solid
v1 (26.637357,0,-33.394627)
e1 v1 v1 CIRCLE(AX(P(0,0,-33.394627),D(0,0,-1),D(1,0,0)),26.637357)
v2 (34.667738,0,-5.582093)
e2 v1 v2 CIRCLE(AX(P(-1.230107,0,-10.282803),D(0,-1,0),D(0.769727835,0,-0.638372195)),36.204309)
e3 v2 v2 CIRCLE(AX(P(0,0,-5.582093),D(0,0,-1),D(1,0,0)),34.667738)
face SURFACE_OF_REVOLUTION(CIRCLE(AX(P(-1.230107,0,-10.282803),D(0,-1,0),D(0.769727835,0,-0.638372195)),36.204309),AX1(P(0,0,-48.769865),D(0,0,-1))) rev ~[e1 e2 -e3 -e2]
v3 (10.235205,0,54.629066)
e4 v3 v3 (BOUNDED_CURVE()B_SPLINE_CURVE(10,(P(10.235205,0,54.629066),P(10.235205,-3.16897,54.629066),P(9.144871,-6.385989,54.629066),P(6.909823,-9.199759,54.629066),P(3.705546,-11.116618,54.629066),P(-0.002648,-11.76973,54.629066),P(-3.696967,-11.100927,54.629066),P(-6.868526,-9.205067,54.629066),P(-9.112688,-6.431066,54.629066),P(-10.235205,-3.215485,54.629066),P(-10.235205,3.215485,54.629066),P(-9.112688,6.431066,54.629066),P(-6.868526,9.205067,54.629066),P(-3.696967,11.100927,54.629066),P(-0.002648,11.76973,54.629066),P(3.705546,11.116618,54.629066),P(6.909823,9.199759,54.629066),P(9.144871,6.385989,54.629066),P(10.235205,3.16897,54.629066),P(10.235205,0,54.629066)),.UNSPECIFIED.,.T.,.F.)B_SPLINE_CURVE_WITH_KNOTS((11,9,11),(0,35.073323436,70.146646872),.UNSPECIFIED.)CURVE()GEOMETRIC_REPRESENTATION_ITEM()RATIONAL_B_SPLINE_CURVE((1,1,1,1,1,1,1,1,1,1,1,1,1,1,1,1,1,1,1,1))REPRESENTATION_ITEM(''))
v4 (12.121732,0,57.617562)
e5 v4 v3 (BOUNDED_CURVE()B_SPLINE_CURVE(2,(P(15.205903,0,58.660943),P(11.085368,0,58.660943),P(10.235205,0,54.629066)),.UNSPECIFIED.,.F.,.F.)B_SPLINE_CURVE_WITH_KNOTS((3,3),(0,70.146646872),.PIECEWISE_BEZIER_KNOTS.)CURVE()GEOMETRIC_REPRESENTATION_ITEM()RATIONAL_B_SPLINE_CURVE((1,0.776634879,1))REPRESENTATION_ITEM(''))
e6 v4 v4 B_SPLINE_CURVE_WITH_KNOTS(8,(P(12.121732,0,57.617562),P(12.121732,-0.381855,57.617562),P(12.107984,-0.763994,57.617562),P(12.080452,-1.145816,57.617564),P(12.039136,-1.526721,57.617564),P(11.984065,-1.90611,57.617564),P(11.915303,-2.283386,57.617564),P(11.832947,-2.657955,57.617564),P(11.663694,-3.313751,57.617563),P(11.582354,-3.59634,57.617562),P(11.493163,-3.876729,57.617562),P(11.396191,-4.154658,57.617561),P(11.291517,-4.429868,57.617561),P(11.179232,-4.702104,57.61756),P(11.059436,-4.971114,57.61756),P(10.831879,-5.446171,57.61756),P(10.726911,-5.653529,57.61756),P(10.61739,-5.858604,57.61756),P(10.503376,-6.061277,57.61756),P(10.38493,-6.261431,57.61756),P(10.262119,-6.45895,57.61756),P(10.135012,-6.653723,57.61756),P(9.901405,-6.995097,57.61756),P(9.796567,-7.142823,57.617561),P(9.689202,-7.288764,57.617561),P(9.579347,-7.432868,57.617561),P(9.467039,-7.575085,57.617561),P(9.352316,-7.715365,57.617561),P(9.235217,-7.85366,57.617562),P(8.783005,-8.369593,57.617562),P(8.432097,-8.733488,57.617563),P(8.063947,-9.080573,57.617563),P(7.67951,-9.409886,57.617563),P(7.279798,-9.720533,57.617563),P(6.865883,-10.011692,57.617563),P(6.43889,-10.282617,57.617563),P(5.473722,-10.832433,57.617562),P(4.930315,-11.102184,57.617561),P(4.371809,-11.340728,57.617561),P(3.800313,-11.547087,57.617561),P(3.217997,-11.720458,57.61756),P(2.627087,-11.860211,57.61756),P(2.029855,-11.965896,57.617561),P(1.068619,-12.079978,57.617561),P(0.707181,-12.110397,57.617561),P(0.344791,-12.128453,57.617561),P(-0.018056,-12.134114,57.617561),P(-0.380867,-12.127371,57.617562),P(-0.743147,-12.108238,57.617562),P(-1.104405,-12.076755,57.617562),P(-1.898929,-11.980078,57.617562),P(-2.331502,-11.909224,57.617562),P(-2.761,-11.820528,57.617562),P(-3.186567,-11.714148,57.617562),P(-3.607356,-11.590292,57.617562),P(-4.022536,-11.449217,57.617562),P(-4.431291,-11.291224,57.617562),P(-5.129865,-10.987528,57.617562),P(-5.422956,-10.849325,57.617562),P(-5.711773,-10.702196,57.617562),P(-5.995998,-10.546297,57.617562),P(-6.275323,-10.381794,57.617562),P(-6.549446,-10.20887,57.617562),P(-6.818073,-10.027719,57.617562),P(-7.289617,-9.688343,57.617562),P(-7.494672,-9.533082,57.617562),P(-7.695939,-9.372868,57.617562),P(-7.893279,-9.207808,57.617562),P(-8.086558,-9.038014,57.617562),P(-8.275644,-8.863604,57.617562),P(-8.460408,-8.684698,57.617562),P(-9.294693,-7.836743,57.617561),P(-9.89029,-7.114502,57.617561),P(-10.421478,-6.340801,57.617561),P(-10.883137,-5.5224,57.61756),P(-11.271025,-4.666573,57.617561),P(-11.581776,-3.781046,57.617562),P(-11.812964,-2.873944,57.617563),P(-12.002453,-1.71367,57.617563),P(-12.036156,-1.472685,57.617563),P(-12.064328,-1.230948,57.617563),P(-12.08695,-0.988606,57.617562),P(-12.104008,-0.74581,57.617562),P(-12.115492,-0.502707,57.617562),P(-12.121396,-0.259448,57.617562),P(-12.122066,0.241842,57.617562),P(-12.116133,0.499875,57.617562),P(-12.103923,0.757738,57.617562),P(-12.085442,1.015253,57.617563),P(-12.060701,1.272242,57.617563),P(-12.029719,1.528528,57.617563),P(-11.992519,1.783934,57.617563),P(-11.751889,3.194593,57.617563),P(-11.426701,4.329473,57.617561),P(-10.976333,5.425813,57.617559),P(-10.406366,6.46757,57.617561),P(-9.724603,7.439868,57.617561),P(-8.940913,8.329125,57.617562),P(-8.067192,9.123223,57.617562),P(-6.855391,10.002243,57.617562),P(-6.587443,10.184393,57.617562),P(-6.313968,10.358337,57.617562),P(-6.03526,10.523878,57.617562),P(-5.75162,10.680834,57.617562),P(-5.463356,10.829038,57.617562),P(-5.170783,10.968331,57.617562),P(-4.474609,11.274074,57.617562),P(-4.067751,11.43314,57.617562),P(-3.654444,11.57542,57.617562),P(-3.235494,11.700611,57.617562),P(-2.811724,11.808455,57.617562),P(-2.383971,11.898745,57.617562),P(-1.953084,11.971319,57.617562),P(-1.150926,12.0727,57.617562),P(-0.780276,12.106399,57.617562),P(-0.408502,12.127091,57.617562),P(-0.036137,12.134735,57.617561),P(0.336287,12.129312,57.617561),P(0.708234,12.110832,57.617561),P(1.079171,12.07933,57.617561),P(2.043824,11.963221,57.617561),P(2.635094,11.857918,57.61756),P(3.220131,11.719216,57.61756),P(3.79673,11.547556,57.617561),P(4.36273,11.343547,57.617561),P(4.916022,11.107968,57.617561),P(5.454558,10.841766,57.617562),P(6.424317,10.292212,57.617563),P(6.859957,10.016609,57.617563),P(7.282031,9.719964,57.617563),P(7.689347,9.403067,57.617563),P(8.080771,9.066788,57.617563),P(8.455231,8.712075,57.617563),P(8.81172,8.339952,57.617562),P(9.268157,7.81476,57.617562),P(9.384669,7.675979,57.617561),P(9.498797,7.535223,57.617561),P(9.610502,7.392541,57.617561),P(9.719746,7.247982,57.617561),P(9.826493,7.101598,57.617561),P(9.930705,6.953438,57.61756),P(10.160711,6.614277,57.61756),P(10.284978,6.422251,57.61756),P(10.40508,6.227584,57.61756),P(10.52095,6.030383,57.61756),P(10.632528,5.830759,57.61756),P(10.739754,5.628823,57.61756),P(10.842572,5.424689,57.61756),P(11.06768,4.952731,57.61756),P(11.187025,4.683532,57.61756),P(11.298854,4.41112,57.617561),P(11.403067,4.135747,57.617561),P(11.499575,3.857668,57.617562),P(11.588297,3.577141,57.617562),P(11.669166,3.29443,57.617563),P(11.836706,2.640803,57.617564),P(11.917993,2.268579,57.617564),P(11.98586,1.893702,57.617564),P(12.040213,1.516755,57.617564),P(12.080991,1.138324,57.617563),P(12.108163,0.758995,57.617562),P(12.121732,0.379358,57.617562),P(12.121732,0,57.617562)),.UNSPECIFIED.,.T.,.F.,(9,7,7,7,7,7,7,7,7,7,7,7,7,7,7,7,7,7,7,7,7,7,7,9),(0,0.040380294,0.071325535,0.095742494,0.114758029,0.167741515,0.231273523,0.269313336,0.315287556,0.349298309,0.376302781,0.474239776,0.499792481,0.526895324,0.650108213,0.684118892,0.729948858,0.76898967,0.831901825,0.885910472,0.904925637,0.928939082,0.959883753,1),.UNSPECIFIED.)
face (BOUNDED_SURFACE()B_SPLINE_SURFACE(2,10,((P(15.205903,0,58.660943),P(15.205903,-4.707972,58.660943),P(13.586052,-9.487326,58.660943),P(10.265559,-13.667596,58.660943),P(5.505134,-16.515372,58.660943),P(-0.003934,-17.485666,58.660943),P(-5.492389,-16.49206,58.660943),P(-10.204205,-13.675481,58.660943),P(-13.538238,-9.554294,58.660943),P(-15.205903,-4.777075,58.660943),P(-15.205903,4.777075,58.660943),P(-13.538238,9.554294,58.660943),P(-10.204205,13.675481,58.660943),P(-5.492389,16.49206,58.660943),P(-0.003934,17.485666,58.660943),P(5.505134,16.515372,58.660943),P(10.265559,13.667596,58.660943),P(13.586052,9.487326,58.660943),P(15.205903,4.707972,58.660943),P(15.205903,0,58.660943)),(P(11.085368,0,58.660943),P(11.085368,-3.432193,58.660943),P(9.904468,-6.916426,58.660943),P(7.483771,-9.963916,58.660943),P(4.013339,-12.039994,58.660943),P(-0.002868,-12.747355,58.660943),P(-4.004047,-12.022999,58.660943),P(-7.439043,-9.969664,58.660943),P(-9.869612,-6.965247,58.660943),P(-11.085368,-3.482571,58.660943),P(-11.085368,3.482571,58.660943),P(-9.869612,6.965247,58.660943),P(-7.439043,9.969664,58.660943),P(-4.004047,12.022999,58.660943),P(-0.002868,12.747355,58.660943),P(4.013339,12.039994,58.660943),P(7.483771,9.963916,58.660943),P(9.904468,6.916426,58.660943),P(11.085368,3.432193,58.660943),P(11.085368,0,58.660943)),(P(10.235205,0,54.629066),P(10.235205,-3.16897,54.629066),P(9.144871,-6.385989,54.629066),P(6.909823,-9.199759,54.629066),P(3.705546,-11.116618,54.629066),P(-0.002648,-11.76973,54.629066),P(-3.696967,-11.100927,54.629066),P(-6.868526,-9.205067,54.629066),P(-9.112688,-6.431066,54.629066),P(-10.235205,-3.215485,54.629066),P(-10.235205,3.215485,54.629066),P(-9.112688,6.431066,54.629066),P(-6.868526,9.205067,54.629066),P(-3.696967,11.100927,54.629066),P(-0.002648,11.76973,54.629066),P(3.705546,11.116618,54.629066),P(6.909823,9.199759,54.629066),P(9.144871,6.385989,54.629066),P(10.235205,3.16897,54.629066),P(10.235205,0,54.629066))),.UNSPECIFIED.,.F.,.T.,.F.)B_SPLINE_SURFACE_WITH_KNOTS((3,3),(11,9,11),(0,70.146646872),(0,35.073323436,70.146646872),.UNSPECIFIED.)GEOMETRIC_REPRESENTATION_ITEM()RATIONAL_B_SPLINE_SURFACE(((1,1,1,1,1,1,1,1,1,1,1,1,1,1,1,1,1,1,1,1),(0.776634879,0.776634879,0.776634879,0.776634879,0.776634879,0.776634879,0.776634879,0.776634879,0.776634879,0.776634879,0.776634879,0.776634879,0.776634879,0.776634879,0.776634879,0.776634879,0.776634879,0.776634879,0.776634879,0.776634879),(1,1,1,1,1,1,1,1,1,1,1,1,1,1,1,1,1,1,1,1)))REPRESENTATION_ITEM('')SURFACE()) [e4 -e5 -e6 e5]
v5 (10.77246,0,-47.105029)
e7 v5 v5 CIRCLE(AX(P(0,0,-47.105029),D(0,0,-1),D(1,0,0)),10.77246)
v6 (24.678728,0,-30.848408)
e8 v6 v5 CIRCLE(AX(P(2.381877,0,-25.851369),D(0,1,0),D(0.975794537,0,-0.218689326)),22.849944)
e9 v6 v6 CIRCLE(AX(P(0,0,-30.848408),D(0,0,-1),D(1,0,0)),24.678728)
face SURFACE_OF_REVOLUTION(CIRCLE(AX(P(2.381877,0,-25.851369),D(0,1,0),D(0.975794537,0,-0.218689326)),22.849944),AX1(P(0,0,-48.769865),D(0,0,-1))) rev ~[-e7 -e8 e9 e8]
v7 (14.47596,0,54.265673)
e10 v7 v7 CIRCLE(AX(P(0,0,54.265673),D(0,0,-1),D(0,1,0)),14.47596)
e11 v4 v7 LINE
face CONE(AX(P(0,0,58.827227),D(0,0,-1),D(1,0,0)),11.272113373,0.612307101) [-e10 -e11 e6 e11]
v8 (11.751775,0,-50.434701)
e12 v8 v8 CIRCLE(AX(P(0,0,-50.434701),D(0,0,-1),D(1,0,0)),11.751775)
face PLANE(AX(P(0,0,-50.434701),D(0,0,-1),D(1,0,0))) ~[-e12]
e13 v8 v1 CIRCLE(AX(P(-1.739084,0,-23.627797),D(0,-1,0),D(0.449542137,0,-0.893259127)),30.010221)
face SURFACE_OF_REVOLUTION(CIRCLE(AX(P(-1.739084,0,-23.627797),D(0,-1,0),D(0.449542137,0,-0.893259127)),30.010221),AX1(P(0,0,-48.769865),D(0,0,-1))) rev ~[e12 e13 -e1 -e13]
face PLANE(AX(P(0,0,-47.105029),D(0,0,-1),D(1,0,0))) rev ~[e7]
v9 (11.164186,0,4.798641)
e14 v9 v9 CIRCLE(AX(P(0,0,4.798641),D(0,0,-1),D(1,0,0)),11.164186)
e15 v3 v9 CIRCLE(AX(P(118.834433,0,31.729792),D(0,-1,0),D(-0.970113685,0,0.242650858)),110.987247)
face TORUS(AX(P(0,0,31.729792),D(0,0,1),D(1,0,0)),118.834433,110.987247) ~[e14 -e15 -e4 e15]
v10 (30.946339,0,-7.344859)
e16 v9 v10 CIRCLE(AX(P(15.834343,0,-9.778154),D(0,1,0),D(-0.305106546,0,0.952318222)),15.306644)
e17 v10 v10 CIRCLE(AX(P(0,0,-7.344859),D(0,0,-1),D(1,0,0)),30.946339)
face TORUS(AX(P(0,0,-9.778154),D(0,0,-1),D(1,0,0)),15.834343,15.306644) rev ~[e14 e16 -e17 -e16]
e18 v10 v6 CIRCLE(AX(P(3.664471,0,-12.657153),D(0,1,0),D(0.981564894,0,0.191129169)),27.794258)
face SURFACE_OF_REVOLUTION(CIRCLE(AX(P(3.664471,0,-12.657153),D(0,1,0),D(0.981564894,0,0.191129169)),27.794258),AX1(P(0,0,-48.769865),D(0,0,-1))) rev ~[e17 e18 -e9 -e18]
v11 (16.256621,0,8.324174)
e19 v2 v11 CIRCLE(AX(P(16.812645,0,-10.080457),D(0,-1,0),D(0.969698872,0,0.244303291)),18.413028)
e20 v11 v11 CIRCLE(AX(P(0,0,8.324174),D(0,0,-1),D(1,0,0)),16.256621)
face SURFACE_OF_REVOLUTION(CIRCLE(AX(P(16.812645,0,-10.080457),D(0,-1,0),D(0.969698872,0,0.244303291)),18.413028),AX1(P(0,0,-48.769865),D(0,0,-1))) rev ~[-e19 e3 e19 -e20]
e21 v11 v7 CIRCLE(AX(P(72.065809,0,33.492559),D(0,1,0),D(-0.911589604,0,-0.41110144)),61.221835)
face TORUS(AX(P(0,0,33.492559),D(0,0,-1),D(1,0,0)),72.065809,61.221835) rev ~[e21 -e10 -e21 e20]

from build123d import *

# Parameters (mm, degrees)
F2_R = 5.08


# Not quite as in the source:
# - a fillet or chamfer that OpenCascade refuses, or shapes differently, is made with other operations: its cross-section is extruded or revolved along the edge and cut away or added


with BuildPart() as f1:
    # F0 (on Front) → F1 (revolve)
    with BuildSketch(Plane.XZ):
        with BuildLine():
            Line((0, -47.1050292253), (0, -50.4347011447))
            Line((0, -50.4347011447), (11.7517746985, -50.4347011447))
            ThreePointArc((11.7517746985, -50.4347011447), (20.8619938289, -43.371268105), (26.6373567283, -33.3946272731))
            ThreePointArc((26.6373567283, -33.3946272731), (33.5533359341, -20.325912086), (34.667737782, -5.5820932612))
            ThreePointArc((34.667737782, -5.5820932612), (27.9104157982, 4.6123678288), (16.2566211075, 8.3241742104))
            ThreePointArc((16.2566211075, 8.3241742104), (10.8439744561, 33.4925586358), (16.2566211075, 58.6609430611))
            Line((16.2566211075, 58.6609430611), (11.164185591, 58.6609430611))
            ThreePointArc((11.164185591, 58.6609430611), (7.8471857088, 31.7297922447), (11.164185591, 4.7986414284))
            ThreePointArc((11.164185591, 4.7986414284), (23.8420983973, 3.2667371045), (30.9463385493, -7.3448591866))
            ThreePointArc((30.9463385493, -7.3448591866), (30.5202544526, -19.8186924416), (24.6787276119, -30.8484081179))
            ThreePointArc((24.6787276119, -30.8484081179), (19.7456058465, -40.7046808706), (10.7724601403, -47.1050292253))
            Line((10.7724601403, -47.1050292253), (0, -47.1050292253))
        make_face()
    revolve(axis=Axis((0, 0, -48.769865185), (0, 0, -1)))

    # F2
    f2_edges = [f1.edges().sort_by_distance(p)[0] for p in [
        (-11.164186, 0, 58.660943),
    ]]
    fillet(f2_edges, radius=F2_R)

    # F3: chamfer of 5.08 on 1 edges, made by hand

    # F3_s1 → F3_t2 (revolve, cut)
    with BuildSketch(Plane.XZ):
        with BuildLine():
            Line((11.2721133728, 58.8272265334), (14.5927501506, 54.0993891808))
            Line((14.5927501506, 54.0993891808), (14.6883227311, 54.0649153956))
            ThreePointArc((14.6883227311, 54.0649153956), (15.3971944751, 56.3912747767), (16.3492386112, 58.6191751549))
            Line((16.3492386112, 58.6191751549), (16.2566211075, 58.7625430611))
            ThreePointArc((16.2566211075, 58.7625430611), (13.7643672402, 58.7625430611), (11.2721133728, 58.9288265334))
            Line((11.2721133728, 58.9288265334), (11.2721133728, 58.8272265334))
        make_face()
    revolve(axis=Axis((0, 0, 58.6609430611), (0, 0, -1)), mode=Mode.SUBTRACT)


solid = f1.part
